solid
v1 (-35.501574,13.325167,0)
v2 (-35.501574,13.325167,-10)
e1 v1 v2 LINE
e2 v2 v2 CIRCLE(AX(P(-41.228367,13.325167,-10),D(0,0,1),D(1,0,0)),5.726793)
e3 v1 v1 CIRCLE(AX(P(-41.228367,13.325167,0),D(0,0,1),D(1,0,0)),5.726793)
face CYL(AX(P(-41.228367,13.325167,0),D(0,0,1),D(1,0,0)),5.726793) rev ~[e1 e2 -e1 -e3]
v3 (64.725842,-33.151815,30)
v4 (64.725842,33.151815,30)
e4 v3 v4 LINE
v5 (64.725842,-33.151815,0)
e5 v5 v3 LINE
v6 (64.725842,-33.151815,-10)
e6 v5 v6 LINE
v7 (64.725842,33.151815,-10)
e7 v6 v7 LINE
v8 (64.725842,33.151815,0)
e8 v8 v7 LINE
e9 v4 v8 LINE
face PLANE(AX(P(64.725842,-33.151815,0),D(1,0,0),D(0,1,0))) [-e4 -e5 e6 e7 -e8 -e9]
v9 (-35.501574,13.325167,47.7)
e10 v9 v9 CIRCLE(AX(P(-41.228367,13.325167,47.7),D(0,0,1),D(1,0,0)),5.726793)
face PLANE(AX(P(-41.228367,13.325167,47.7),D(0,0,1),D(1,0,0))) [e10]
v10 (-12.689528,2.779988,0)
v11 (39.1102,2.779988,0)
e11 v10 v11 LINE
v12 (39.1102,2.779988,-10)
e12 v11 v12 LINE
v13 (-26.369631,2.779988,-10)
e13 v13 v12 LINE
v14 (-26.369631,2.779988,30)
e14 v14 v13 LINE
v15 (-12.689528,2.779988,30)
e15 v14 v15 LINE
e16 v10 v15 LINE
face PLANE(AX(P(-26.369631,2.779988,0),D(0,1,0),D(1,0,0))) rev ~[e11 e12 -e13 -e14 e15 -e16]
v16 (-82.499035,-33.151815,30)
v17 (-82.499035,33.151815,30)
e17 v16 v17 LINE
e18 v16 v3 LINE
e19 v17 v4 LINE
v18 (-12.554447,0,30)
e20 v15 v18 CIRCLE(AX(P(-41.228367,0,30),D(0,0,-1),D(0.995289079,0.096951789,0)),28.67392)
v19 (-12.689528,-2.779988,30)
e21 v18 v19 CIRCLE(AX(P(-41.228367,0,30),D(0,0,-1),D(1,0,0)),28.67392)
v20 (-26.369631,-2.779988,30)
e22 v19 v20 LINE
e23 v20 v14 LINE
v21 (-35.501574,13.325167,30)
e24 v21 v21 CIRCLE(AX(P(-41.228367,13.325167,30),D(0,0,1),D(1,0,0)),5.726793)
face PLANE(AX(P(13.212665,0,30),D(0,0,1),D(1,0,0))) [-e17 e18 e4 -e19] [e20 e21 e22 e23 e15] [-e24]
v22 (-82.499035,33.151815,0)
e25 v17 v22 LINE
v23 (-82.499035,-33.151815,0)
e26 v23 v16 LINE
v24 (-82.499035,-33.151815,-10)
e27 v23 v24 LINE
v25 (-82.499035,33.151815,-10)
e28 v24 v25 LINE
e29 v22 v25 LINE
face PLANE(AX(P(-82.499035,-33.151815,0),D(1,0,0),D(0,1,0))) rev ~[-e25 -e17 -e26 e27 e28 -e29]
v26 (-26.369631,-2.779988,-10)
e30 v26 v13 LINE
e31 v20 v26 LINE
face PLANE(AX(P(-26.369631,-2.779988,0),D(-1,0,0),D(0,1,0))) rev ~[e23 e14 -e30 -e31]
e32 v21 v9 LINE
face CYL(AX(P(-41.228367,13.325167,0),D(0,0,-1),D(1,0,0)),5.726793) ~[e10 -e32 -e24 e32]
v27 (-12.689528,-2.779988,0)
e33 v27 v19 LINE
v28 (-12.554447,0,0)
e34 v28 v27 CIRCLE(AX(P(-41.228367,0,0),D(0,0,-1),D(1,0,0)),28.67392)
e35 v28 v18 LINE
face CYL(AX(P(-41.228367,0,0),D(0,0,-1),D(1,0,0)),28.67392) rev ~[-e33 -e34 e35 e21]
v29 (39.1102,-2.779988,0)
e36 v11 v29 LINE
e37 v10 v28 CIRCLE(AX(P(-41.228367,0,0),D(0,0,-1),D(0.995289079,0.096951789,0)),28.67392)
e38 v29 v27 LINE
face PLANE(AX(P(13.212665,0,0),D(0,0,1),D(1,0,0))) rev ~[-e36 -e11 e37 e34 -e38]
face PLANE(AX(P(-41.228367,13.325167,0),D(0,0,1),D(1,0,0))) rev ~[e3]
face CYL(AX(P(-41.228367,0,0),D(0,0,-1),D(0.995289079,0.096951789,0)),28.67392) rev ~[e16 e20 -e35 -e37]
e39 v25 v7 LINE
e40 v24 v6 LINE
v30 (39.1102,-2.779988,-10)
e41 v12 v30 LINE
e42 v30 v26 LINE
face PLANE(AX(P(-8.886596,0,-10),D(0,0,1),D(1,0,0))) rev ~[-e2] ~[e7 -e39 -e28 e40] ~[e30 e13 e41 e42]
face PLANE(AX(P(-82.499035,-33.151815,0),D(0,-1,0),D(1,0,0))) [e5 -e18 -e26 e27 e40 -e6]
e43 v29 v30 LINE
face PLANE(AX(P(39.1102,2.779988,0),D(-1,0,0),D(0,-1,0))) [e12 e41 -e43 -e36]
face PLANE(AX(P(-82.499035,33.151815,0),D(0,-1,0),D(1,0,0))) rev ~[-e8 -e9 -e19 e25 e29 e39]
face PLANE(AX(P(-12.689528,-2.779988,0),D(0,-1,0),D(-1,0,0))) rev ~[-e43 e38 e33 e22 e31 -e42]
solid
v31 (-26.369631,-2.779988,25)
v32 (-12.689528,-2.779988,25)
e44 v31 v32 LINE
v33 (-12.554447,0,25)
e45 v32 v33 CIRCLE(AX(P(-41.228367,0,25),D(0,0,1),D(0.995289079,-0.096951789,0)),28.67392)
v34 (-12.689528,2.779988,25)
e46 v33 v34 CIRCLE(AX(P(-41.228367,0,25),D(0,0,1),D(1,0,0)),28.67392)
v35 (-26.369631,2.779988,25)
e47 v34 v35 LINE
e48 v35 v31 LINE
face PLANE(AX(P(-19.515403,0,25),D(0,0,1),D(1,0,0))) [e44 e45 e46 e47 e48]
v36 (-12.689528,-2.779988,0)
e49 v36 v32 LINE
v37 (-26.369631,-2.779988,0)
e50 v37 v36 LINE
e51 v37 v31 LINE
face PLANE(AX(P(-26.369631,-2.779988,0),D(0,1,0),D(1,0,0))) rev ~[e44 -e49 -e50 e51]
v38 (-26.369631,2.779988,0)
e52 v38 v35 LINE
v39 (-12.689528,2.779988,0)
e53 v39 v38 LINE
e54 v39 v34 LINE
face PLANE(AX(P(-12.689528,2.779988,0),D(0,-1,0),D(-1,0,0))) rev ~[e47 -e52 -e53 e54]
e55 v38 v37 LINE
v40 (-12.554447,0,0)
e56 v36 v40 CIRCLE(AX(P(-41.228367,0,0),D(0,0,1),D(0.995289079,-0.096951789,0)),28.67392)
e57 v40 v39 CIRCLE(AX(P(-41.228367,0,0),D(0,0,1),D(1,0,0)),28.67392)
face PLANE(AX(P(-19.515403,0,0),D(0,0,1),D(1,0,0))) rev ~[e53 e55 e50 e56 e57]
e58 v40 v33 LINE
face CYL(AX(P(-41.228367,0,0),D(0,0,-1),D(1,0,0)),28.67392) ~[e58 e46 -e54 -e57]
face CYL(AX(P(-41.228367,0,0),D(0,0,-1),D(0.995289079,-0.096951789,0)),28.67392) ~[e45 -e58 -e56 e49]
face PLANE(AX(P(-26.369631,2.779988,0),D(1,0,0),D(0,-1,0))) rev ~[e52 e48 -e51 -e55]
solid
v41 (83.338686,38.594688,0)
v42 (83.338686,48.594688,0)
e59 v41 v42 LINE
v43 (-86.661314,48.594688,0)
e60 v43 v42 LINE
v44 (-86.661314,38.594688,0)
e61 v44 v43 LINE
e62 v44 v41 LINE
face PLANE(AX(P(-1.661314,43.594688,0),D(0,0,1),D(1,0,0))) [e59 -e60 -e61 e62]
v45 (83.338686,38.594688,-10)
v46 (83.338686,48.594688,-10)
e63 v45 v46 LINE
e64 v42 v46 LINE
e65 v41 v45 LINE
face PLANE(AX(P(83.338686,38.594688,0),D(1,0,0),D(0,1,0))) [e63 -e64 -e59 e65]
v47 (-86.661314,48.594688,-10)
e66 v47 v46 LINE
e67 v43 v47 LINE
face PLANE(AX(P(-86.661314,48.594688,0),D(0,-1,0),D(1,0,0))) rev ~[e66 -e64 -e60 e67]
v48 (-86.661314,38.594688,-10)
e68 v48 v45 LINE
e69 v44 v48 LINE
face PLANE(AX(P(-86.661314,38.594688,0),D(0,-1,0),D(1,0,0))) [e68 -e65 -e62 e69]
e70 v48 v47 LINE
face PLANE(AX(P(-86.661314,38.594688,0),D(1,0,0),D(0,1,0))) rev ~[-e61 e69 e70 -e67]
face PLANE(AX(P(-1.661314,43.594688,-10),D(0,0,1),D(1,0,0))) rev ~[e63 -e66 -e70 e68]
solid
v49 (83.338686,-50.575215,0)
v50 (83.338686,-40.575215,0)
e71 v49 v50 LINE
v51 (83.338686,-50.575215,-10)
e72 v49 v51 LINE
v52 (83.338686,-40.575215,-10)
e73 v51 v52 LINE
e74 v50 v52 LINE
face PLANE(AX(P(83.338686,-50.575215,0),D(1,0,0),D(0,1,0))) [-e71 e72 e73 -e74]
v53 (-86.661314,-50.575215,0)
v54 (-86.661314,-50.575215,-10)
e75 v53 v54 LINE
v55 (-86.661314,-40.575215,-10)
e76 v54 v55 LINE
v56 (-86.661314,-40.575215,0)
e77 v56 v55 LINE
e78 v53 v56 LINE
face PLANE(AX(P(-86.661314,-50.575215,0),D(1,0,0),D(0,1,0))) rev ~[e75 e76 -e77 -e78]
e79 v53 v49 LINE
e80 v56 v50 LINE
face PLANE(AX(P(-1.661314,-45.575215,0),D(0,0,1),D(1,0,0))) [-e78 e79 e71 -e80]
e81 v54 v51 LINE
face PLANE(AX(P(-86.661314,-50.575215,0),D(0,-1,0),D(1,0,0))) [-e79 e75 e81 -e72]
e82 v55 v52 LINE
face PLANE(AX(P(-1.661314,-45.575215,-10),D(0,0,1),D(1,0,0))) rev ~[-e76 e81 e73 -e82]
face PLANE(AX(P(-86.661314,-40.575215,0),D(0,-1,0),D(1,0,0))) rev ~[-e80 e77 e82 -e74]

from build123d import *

# Parameters (mm, degrees)
F0_W         = 147.224877195
F0_H         = 66.3036294561
F0_R         = 5.7267932756
F1_DEPTH     = 10
F0_W_2       = 170
F0_H_2       = 10
F1_FACE_W    = 147.224877195
F1_FACE_H    = 66.3036294561
F1_FACE_W_2  = 65.479831006
F1_FACE_H_2  = 5.5599757362
F1_FACE_R    = 5.7267932756
F1_FACE1_W   = 147.224877195
F1_FACE1_H   = 66.3036294561
F1_FACE1_W_2 = 65.479831006
F1_FACE1_H_2 = 5.5599757362
F1_FACE1_R   = 5.7267932756
F2_DEPTH     = 30
F3_DEPTH     = 25
F4_DEPTH     = 47.7


# Not quite as in the source:
# - the program builds the solid bodies; features that only make, move or delete a surface that nothing else refers to are left out


with BuildPart() as f1:
    # F0 (on Top) → F1 (new body)
    with BuildSketch(Plane.XY):
        with Locations((-8.8865962121, 0)):
            Rectangle(F0_W, F0_H)
        with BuildLine():
            ThreePointArc((-12.689527612, -2.7799878681), (-69.902287741, 0), (-12.689527612, 2.7799878681))
            Line((-12.689527612, 2.7799878681), (39.1101999373, 2.7799878681))
            Line((39.1101999373, 2.7799878681), (39.1101999373, -2.7799878681))
            Line((39.1101999373, -2.7799878681), (-12.689527612, -2.7799878681))
        make_face(mode=Mode.SUBTRACT)
        with BuildLine():
            Line((-26.3696310687, 2.7799878681), (-12.689527612, 2.7799878681))
            ThreePointArc((-12.689527612, 2.7799878681), (-69.902287741, 0), (-12.689527612, -2.7799878681))
            Line((-12.689527612, -2.7799878681), (-26.3696310687, -2.7799878681))
            Line((-26.3696310687, -2.7799878681), (-26.3696310687, 2.7799878681))
        make_face()
        with Locations((-41.2283673889, 13.3251665685)):
            Circle(F0_R, mode=Mode.SUBTRACT)
    extrude(amount=-F1_DEPTH)

    # F0 (on Top) + F1_face (on face) + F1_face1 (on face) → F2 (join)
    with BuildSketch(Plane.XY):
        with BuildLine():
            Line((-26.3696310687, 2.7799878681), (-12.689527612, 2.7799878681))
            ThreePointArc((-12.689527612, 2.7799878681), (-69.902287741, 0), (-12.689527612, -2.7799878681))
            Line((-12.689527612, -2.7799878681), (-26.3696310687, -2.7799878681))
            Line((-26.3696310687, -2.7799878681), (-26.3696310687, 2.7799878681))
        make_face()
        with Locations((-41.2283673889, 13.3251665685)):
            Circle(F0_R, mode=Mode.SUBTRACT)
        with BuildLine():
            ThreePointArc((-12.689527612, 2.7799878681), (-12.5882370901, 1.3916338697), (-12.5544470368, 0))
            ThreePointArc((-12.5544470368, 0), (-12.5882370901, -1.3916338697), (-12.689527612, -2.7799878681))
            Line((-12.689527612, -2.7799878681), (39.1101999373, -2.7799878681))
            Line((39.1101999373, -2.7799878681), (39.1101999373, 2.7799878681))
            Line((39.1101999373, 2.7799878681), (-12.689527612, 2.7799878681))
        make_face()
    with BuildSketch(Plane(origin=(-9.1256930522, -0.1477141359, 0), x_dir=(1, 0, 0), z_dir=(0, 0, 1))):
        with Locations((0.2390968402, 0.1477141359)):
            Rectangle(F1_FACE_W, F1_FACE_H)
        with Locations((15.4959774865, 0.1477141359)):
            Rectangle(F1_FACE_W_2, F1_FACE_H_2, mode=Mode.SUBTRACT)
        with Locations((-32.1026743367, 13.4728807044)):
            Circle(F1_FACE_R, mode=Mode.SUBTRACT)
    with BuildSketch(Plane(origin=(-9.1256930522, -0.1477141359, -10), x_dir=(1, 0, 0), z_dir=(0, 0, -1))):
        with Locations((0.2390968402, -0.1477141359)):
            Rectangle(F1_FACE1_W, F1_FACE1_H)
        with Locations((15.4959774865, -0.1477141359)):
            Rectangle(F1_FACE1_W_2, F1_FACE1_H_2, mode=Mode.SUBTRACT)
        with Locations((-32.1026743367, -13.4728807044)):
            Circle(F1_FACE1_R, mode=Mode.SUBTRACT)
    extrude(amount=F2_DEPTH, dir=(0, 0, 1))

    # F0 (on Top) → F4 (join)
    with BuildSketch(Plane.XY):
        with Locations((-41.2283673889, 13.3251665685)):
            Circle(F0_R)
    extrude(amount=F4_DEPTH)


with BuildPart() as f1b:
    # F0 (on Top) → F1, piece 2 (new body)
    with BuildSketch(Plane.XY):
        with Locations((-1.6613137935, -45.5752154062)):
            Rectangle(F0_W_2, F0_H_2)
    extrude(amount=-F1_DEPTH)


with BuildPart() as f1c:
    # F0 (on Top) → F1, piece 3 (new body)
    with BuildSketch(Plane.XY):
        with Locations((-1.6613137935, 43.5946881741)):
            Rectangle(F0_W_2, F0_H_2)
    extrude(amount=-F1_DEPTH)


with BuildPart() as f3:
    # F0 (on Top) → F3 (new body)
    with BuildSketch(Plane.XY):
        with BuildLine():
            ThreePointArc((-12.689527612, -2.7799878681), (-12.5882370901, -1.3916338697), (-12.5544470368, 0))
            ThreePointArc((-12.5544470368, 0), (-12.5882370901, 1.3916338697), (-12.689527612, 2.7799878681))
            Line((-12.689527612, 2.7799878681), (-26.3696310687, 2.7799878681))
            Line((-26.3696310687, 2.7799878681), (-26.3696310687, -2.7799878681))
            Line((-26.3696310687, -2.7799878681), (-12.689527612, -2.7799878681))
        make_face()
    extrude(amount=F3_DEPTH)


solid = Compound([f1.part, f1b.part, f1c.part, f3.part])
